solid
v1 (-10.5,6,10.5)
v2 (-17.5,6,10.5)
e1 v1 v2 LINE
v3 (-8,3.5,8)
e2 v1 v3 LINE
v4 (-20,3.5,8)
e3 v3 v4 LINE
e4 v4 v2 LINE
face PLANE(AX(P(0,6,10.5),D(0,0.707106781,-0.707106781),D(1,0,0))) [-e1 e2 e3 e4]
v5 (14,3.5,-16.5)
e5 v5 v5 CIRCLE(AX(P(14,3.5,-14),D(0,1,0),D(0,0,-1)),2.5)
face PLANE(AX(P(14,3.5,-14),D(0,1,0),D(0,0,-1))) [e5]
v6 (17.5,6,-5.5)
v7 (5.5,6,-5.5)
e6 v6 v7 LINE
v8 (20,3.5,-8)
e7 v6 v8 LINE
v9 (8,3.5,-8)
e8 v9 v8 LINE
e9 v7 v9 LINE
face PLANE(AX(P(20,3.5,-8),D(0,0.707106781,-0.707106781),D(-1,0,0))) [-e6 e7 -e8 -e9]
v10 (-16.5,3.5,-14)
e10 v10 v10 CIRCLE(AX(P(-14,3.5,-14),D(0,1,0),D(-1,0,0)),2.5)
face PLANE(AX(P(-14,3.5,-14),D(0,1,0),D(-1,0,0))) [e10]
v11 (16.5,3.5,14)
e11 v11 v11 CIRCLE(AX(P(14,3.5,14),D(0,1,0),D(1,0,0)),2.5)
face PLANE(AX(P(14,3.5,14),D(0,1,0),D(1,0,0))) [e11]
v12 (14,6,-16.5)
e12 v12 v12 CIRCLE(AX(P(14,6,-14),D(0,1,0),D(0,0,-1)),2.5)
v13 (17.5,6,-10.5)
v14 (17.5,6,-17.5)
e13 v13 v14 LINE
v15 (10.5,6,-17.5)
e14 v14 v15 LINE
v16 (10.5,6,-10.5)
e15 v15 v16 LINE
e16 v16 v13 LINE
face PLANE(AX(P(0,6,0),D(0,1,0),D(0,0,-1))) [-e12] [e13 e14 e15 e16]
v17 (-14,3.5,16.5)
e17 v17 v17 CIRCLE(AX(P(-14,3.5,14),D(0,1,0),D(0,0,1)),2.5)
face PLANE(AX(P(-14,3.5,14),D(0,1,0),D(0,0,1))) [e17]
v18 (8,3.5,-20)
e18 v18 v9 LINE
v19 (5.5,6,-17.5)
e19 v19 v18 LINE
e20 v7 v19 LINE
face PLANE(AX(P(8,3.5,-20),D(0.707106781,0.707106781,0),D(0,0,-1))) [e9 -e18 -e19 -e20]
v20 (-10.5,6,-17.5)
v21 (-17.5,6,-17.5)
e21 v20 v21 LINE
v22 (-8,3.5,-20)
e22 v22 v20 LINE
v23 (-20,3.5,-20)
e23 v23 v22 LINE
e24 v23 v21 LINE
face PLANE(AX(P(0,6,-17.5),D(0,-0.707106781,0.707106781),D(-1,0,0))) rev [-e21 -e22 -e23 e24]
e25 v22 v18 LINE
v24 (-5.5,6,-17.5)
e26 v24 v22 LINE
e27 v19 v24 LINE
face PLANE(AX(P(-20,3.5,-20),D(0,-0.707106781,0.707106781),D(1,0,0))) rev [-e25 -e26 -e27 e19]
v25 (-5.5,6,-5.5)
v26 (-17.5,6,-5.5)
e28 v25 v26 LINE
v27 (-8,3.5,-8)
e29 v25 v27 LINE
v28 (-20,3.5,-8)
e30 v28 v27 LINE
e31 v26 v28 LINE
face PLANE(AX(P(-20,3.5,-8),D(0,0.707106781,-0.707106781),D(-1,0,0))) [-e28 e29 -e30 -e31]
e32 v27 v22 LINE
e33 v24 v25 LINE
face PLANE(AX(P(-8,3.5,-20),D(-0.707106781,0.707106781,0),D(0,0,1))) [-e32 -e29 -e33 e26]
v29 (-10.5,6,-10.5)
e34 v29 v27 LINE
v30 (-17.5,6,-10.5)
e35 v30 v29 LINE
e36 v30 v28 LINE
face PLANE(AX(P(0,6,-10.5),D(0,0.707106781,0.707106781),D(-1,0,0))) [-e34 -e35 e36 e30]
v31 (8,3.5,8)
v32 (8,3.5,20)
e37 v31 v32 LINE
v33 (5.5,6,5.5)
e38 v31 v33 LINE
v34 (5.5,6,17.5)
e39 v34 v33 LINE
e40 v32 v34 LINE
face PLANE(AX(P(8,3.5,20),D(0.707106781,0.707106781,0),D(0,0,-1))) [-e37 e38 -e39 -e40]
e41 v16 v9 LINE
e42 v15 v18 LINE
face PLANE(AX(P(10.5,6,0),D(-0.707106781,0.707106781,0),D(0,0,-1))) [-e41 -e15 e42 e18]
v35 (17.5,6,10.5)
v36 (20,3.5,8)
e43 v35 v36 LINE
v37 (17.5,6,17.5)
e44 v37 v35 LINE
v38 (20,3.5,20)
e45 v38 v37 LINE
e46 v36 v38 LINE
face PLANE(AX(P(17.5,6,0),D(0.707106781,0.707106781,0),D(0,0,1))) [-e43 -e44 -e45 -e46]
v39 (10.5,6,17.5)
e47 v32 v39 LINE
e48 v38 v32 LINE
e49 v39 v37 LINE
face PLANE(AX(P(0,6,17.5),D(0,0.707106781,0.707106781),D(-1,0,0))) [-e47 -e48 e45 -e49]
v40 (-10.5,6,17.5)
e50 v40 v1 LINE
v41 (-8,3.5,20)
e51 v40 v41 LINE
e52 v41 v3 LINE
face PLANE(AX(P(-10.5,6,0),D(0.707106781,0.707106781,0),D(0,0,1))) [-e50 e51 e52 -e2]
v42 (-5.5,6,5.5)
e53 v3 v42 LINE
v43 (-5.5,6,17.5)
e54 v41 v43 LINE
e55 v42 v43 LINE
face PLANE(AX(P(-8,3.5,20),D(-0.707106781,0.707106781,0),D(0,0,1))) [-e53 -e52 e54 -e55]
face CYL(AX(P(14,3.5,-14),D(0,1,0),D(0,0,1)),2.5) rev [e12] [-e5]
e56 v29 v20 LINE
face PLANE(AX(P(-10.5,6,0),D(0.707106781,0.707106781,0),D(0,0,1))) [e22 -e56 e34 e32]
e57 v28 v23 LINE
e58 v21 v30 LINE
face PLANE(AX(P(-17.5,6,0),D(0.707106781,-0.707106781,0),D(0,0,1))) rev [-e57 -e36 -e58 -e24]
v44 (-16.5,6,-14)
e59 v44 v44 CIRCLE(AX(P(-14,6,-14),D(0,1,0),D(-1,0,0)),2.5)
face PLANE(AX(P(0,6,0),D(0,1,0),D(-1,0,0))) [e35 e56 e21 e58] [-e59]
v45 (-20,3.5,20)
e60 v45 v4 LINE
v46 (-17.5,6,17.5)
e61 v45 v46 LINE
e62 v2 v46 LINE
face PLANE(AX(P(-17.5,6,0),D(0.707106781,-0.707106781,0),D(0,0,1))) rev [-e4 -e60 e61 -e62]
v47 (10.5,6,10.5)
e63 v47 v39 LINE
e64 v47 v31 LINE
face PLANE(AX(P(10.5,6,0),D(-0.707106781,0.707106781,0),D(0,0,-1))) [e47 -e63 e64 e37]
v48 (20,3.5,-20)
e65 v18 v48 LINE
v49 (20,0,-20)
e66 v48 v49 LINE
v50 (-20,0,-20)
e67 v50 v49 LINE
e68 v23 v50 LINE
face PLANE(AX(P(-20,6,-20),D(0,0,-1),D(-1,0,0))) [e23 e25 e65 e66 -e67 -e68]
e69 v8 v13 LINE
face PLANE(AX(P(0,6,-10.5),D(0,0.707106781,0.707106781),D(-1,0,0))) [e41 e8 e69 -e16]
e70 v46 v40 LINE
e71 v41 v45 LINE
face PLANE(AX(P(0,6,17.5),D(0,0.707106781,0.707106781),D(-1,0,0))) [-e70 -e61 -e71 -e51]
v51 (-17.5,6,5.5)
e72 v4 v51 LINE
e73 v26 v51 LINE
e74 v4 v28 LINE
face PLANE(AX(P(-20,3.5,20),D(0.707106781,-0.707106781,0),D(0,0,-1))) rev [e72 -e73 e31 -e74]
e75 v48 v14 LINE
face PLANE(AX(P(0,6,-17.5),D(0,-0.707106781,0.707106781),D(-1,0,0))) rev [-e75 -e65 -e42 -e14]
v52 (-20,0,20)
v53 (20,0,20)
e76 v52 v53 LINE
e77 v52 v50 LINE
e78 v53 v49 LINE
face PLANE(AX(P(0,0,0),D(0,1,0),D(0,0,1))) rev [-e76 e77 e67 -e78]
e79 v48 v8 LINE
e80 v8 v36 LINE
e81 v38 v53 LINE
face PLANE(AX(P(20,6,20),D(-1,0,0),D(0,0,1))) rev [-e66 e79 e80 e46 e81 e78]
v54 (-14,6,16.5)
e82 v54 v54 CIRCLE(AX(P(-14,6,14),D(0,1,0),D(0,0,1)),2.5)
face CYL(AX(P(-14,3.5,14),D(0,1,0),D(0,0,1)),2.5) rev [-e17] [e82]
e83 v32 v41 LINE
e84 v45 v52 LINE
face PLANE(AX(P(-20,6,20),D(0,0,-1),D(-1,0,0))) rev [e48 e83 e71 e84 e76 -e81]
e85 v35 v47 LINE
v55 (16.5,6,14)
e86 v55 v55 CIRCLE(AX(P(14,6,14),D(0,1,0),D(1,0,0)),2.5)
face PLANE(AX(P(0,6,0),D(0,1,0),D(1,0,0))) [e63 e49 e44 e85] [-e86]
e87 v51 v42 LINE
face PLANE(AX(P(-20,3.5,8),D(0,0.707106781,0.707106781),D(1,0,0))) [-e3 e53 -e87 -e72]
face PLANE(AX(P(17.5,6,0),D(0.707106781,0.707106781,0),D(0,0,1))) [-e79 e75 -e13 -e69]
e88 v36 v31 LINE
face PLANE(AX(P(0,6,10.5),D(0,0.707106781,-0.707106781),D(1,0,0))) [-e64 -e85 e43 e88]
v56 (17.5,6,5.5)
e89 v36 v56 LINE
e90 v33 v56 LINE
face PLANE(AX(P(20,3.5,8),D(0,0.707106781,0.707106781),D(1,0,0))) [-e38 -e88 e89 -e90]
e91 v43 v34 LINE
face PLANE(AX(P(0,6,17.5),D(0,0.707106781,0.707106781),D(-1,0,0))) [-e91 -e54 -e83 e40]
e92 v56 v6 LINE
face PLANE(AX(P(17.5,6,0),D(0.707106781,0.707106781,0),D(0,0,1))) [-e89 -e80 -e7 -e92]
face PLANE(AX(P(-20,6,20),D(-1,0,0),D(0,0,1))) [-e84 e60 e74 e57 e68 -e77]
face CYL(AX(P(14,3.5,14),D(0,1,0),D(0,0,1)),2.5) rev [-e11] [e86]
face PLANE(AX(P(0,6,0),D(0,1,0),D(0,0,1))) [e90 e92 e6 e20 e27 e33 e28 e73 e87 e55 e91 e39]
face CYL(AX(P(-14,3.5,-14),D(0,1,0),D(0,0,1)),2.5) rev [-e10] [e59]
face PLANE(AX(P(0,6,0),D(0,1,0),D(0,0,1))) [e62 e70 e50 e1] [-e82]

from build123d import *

# Parameters (mm, degrees)
SKETCH1_W               = 40
SKETCH1_H               = 40
BOSS_EXTRUDE1_DEPTH     = 6
SKETCH2_W               = 12
SKETCH2_H               = 12
CUT_EXTRUDE1_DEPTH      = 2.5
CHAMFER1_SIZE           = 2.5
SKETCH3_W               = 12
SKETCH3_H               = 12
BOSS_EXTRUDE2_DEPTH     = 2.5
CHAMFER2_SIZE           = 2.5
CIRPATTERN1_OUTLINE_W   = 7
CIRPATTERN1_OUTLINE_H   = 7
CIRPATTERN1_DEPTH       = 2.5
CIRPATTERN1_DRAFT       = 45
CIRPATTERN1_2_OUTLINE_W = 7
CIRPATTERN1_2_OUTLINE_H = 7
CIRPATTERN1_2_DEPTH     = 2.5
CIRPATTERN1_2_DRAFT     = 45
CIRPATTERN1_3_OUTLINE_W = 7
CIRPATTERN1_3_OUTLINE_H = 7
CIRPATTERN1_3_DEPTH     = 2.5
CIRPATTERN1_3_DRAFT     = 45
SKETCH4_R               = 2.5
CUT_EXTRUDE2_DEPTH      = 2.5
CIRPATTERN2_COUNT       = 4


# Read off the part's stored shape, not the designer's step: CirPattern1
# Some blends are built 0.0001 mm under size
with BuildPart() as part:
    # Sketch1 → Boss-Extrude1 (new body)
    with BuildSketch(Plane(origin=(0, 0, 0), x_dir=(1, 0, 0), z_dir=(0, 1, 0))):
        Rectangle(SKETCH1_W, SKETCH1_H)
    extrude(amount=BOSS_EXTRUDE1_DEPTH)

    # Sketch2 → Cut-Extrude1 (cut)
    with BuildSketch(Plane(origin=(0, 6, 0), x_dir=(1, 0, 0), z_dir=(0, 1, 0))):
        with Locations((14, 14)):
            Rectangle(SKETCH2_W, SKETCH2_H)
        with Locations((-14, 14)):
            Rectangle(SKETCH2_W, SKETCH2_H)
        with Locations((14, -14)):
            Rectangle(SKETCH2_W, SKETCH2_H)
        with Locations((-14, -14)):
            Rectangle(SKETCH2_W, SKETCH2_H)
    extrude(amount=-CUT_EXTRUDE1_DEPTH, mode=Mode.SUBTRACT)

    # Chamfer1
    chamfer1_edges = [part.edges().sort_by_distance(p)[0] for p in [
        (-20, 6, 0),
        (-14, 6, -8),
        (-8, 6, -14),
        (0, 6, -20),
        (8, 6, -14),
        (14, 6, -8),
        (20, 6, 0),
        (14, 6, 8),
        (8, 6, 14),
        (0, 6, 20),
        (-8, 6, 14),
        (-14, 6, 8),
    ]]
    chamfer(chamfer1_edges, length=CHAMFER1_SIZE - 0.0001)  # a hair under: the kernel refuses the full size

    # Sketch3 → Boss-Extrude2 (add)
    with BuildSketch(Plane(origin=(0, 3.5, 0), x_dir=(1, 0, 0), z_dir=(0, 1, 0))):
        with Locations((-14, -14)):
            Rectangle(SKETCH3_W, SKETCH3_H)
    extrude(amount=BOSS_EXTRUDE2_DEPTH)

    # Chamfer2
    # the kernel refuses this chamfer: 2.5 mm, written as the material it takes off along each edge
    with BuildSketch(Plane(origin=(-26.42920747, 6, 8), x_dir=(0, -0.9996219169112968, -0.027495876610586317), z_dir=(1, 0, 0)), Plane(origin=(-8, 6, 8), x_dir=(0.027495876610586317, -0.9996219169112968, 0), z_dir=(0, 0, 1))) as chamfer2_piece_1:
        Polygon((CHAMFER2_SIZE * 0.999621916911, -CHAMFER2_SIZE * 0.0274958766106), (-CHAMFER2_SIZE * 0.0274958766106, -CHAMFER2_SIZE * 0.999621916911), (0, 0), align=None)
    extrude(amount=18.42920747, mode=Mode.SUBTRACT)
    with BuildSketch(Plane(origin=(-1.57079253, 6, 20), x_dir=(0, -0.9996219169112968, 0.027495876610586317), z_dir=(-1, 0, 0))) as chamfer2_piece_2:
        Polygon((CHAMFER2_SIZE * 0.999621916911, -CHAMFER2_SIZE * 0.0274958766106), (-CHAMFER2_SIZE * 0.0274958766106, -CHAMFER2_SIZE * 0.999621916911), (0, 0), align=None)
    extrude(amount=24.85841494, mode=Mode.SUBTRACT)
    with BuildSketch(Plane(origin=(-20, 6, 26.42920747), x_dir=(0.9996219169112968, 0.027495876610586317, 0), z_dir=(0, 0, -1))) as chamfer2_piece_3:
        Polygon((CHAMFER2_SIZE * 0.999621916911, CHAMFER2_SIZE * 0.0274958766106), (-CHAMFER2_SIZE * 0.0274958766106, CHAMFER2_SIZE * 0.999621916911), (0, 0), align=None)
    extrude(amount=24.85841494, mode=Mode.SUBTRACT)


with BuildPart() as cirpattern1_tool:
    # CirPattern1 outline → CirPattern1 (with draft: the straight prism first)
    with BuildSketch(Plane(origin=(0, 6, 0), x_dir=(1, 0, 0), z_dir=(0, 1, 0))):
        with Locations((14, -14)):
            Rectangle(CIRPATTERN1_OUTLINE_W, CIRPATTERN1_OUTLINE_H)
    extrude(amount=-CIRPATTERN1_DEPTH)
    # CirPattern1: the draft: its side faces are tilted about the plane it starts from
    cirpattern1_sides = [cirpattern1_tool.faces().sort_by_distance(p)[0] for p in [
        (14, 4.75, 10.5),
        (10.5, 4.75, 14),
        (14, 4.75, 17.5),
        (17.5, 4.75, 14),
    ]]
    draft(cirpattern1_sides, Plane(origin=(0, 6, 0), x_dir=(1, 0, 0), z_dir=(0, 1, 0)), CIRPATTERN1_DRAFT)


with BuildPart() as part_1:
    add(part.part)

    # CirPattern1: add cirpattern1_tool
    add(cirpattern1_tool.part)


with BuildPart() as cirpattern1_2_tool:
    # CirPattern1 2 outline → CirPattern1 2 (with draft: the straight prism first)
    with BuildSketch(Plane(origin=(0, 6, 0), x_dir=(1, 0, 0), z_dir=(0, 1, 0))):
        with Locations((14, 14)):
            Rectangle(CIRPATTERN1_2_OUTLINE_W, CIRPATTERN1_2_OUTLINE_H)
    extrude(amount=-CIRPATTERN1_2_DEPTH)
    # CirPattern1 2: the draft: its side faces are tilted about the plane it starts from
    cirpattern1_2_sides = [cirpattern1_2_tool.faces().sort_by_distance(p)[0] for p in [
        (10.5, 4.75, -14),
        (14, 4.75, -10.5),
        (17.5, 4.75, -14),
        (14, 4.75, -17.5),
    ]]
    draft(cirpattern1_2_sides, Plane(origin=(0, 6, 0), x_dir=(1, 0, 0), z_dir=(0, 1, 0)), CIRPATTERN1_2_DRAFT)


with BuildPart() as part_2:
    add(part_1.part)

    # CirPattern1 2: add cirpattern1_2_tool
    add(cirpattern1_2_tool.part)


with BuildPart() as cirpattern1_3_tool:
    # CirPattern1 3 outline → CirPattern1 3 (with draft: the straight prism first)
    with BuildSketch(Plane(origin=(0, 6, 0), x_dir=(1, 0, 0), z_dir=(0, 1, 0))):
        with Locations((-14, 14)):
            Rectangle(CIRPATTERN1_3_OUTLINE_W, CIRPATTERN1_3_OUTLINE_H)
    extrude(amount=-CIRPATTERN1_3_DEPTH)
    # CirPattern1 3: the draft: its side faces are tilted about the plane it starts from
    cirpattern1_3_sides = [cirpattern1_3_tool.faces().sort_by_distance(p)[0] for p in [
        (-14, 4.75, -10.5),
        (-10.5, 4.75, -14),
        (-14, 4.75, -17.5),
        (-17.5, 4.75, -14),
    ]]
    draft(cirpattern1_3_sides, Plane(origin=(0, 6, 0), x_dir=(1, 0, 0), z_dir=(0, 1, 0)), CIRPATTERN1_3_DRAFT)


with BuildPart() as part_3:
    add(part_2.part)

    # CirPattern1 3: add cirpattern1_3_tool
    add(cirpattern1_3_tool.part)

    # Sketch4 → Cut-Extrude2 (cut)
    with BuildSketch(Plane(origin=(0, 6, 0), x_dir=(1, 0, 0), z_dir=(0, 1, 0))):
        with Locations(Location((-14, -14, 0), (0, 0, 270))):
            Circle(SKETCH4_R)
    cut_extrude2 = extrude(amount=-CUT_EXTRUDE2_DEPTH, mode=Mode.SUBTRACT)

    # CirPattern2: Cut-Extrude2 ×4 about axis
    cirpattern2_axis = Axis((0, 0, 0), (0, 1, 0))
    for i in range(1, CIRPATTERN2_COUNT):
        add(cut_extrude2.rotate(cirpattern2_axis, i * 360 / CIRPATTERN2_COUNT), mode=Mode.SUBTRACT)


solid = part_3.part
